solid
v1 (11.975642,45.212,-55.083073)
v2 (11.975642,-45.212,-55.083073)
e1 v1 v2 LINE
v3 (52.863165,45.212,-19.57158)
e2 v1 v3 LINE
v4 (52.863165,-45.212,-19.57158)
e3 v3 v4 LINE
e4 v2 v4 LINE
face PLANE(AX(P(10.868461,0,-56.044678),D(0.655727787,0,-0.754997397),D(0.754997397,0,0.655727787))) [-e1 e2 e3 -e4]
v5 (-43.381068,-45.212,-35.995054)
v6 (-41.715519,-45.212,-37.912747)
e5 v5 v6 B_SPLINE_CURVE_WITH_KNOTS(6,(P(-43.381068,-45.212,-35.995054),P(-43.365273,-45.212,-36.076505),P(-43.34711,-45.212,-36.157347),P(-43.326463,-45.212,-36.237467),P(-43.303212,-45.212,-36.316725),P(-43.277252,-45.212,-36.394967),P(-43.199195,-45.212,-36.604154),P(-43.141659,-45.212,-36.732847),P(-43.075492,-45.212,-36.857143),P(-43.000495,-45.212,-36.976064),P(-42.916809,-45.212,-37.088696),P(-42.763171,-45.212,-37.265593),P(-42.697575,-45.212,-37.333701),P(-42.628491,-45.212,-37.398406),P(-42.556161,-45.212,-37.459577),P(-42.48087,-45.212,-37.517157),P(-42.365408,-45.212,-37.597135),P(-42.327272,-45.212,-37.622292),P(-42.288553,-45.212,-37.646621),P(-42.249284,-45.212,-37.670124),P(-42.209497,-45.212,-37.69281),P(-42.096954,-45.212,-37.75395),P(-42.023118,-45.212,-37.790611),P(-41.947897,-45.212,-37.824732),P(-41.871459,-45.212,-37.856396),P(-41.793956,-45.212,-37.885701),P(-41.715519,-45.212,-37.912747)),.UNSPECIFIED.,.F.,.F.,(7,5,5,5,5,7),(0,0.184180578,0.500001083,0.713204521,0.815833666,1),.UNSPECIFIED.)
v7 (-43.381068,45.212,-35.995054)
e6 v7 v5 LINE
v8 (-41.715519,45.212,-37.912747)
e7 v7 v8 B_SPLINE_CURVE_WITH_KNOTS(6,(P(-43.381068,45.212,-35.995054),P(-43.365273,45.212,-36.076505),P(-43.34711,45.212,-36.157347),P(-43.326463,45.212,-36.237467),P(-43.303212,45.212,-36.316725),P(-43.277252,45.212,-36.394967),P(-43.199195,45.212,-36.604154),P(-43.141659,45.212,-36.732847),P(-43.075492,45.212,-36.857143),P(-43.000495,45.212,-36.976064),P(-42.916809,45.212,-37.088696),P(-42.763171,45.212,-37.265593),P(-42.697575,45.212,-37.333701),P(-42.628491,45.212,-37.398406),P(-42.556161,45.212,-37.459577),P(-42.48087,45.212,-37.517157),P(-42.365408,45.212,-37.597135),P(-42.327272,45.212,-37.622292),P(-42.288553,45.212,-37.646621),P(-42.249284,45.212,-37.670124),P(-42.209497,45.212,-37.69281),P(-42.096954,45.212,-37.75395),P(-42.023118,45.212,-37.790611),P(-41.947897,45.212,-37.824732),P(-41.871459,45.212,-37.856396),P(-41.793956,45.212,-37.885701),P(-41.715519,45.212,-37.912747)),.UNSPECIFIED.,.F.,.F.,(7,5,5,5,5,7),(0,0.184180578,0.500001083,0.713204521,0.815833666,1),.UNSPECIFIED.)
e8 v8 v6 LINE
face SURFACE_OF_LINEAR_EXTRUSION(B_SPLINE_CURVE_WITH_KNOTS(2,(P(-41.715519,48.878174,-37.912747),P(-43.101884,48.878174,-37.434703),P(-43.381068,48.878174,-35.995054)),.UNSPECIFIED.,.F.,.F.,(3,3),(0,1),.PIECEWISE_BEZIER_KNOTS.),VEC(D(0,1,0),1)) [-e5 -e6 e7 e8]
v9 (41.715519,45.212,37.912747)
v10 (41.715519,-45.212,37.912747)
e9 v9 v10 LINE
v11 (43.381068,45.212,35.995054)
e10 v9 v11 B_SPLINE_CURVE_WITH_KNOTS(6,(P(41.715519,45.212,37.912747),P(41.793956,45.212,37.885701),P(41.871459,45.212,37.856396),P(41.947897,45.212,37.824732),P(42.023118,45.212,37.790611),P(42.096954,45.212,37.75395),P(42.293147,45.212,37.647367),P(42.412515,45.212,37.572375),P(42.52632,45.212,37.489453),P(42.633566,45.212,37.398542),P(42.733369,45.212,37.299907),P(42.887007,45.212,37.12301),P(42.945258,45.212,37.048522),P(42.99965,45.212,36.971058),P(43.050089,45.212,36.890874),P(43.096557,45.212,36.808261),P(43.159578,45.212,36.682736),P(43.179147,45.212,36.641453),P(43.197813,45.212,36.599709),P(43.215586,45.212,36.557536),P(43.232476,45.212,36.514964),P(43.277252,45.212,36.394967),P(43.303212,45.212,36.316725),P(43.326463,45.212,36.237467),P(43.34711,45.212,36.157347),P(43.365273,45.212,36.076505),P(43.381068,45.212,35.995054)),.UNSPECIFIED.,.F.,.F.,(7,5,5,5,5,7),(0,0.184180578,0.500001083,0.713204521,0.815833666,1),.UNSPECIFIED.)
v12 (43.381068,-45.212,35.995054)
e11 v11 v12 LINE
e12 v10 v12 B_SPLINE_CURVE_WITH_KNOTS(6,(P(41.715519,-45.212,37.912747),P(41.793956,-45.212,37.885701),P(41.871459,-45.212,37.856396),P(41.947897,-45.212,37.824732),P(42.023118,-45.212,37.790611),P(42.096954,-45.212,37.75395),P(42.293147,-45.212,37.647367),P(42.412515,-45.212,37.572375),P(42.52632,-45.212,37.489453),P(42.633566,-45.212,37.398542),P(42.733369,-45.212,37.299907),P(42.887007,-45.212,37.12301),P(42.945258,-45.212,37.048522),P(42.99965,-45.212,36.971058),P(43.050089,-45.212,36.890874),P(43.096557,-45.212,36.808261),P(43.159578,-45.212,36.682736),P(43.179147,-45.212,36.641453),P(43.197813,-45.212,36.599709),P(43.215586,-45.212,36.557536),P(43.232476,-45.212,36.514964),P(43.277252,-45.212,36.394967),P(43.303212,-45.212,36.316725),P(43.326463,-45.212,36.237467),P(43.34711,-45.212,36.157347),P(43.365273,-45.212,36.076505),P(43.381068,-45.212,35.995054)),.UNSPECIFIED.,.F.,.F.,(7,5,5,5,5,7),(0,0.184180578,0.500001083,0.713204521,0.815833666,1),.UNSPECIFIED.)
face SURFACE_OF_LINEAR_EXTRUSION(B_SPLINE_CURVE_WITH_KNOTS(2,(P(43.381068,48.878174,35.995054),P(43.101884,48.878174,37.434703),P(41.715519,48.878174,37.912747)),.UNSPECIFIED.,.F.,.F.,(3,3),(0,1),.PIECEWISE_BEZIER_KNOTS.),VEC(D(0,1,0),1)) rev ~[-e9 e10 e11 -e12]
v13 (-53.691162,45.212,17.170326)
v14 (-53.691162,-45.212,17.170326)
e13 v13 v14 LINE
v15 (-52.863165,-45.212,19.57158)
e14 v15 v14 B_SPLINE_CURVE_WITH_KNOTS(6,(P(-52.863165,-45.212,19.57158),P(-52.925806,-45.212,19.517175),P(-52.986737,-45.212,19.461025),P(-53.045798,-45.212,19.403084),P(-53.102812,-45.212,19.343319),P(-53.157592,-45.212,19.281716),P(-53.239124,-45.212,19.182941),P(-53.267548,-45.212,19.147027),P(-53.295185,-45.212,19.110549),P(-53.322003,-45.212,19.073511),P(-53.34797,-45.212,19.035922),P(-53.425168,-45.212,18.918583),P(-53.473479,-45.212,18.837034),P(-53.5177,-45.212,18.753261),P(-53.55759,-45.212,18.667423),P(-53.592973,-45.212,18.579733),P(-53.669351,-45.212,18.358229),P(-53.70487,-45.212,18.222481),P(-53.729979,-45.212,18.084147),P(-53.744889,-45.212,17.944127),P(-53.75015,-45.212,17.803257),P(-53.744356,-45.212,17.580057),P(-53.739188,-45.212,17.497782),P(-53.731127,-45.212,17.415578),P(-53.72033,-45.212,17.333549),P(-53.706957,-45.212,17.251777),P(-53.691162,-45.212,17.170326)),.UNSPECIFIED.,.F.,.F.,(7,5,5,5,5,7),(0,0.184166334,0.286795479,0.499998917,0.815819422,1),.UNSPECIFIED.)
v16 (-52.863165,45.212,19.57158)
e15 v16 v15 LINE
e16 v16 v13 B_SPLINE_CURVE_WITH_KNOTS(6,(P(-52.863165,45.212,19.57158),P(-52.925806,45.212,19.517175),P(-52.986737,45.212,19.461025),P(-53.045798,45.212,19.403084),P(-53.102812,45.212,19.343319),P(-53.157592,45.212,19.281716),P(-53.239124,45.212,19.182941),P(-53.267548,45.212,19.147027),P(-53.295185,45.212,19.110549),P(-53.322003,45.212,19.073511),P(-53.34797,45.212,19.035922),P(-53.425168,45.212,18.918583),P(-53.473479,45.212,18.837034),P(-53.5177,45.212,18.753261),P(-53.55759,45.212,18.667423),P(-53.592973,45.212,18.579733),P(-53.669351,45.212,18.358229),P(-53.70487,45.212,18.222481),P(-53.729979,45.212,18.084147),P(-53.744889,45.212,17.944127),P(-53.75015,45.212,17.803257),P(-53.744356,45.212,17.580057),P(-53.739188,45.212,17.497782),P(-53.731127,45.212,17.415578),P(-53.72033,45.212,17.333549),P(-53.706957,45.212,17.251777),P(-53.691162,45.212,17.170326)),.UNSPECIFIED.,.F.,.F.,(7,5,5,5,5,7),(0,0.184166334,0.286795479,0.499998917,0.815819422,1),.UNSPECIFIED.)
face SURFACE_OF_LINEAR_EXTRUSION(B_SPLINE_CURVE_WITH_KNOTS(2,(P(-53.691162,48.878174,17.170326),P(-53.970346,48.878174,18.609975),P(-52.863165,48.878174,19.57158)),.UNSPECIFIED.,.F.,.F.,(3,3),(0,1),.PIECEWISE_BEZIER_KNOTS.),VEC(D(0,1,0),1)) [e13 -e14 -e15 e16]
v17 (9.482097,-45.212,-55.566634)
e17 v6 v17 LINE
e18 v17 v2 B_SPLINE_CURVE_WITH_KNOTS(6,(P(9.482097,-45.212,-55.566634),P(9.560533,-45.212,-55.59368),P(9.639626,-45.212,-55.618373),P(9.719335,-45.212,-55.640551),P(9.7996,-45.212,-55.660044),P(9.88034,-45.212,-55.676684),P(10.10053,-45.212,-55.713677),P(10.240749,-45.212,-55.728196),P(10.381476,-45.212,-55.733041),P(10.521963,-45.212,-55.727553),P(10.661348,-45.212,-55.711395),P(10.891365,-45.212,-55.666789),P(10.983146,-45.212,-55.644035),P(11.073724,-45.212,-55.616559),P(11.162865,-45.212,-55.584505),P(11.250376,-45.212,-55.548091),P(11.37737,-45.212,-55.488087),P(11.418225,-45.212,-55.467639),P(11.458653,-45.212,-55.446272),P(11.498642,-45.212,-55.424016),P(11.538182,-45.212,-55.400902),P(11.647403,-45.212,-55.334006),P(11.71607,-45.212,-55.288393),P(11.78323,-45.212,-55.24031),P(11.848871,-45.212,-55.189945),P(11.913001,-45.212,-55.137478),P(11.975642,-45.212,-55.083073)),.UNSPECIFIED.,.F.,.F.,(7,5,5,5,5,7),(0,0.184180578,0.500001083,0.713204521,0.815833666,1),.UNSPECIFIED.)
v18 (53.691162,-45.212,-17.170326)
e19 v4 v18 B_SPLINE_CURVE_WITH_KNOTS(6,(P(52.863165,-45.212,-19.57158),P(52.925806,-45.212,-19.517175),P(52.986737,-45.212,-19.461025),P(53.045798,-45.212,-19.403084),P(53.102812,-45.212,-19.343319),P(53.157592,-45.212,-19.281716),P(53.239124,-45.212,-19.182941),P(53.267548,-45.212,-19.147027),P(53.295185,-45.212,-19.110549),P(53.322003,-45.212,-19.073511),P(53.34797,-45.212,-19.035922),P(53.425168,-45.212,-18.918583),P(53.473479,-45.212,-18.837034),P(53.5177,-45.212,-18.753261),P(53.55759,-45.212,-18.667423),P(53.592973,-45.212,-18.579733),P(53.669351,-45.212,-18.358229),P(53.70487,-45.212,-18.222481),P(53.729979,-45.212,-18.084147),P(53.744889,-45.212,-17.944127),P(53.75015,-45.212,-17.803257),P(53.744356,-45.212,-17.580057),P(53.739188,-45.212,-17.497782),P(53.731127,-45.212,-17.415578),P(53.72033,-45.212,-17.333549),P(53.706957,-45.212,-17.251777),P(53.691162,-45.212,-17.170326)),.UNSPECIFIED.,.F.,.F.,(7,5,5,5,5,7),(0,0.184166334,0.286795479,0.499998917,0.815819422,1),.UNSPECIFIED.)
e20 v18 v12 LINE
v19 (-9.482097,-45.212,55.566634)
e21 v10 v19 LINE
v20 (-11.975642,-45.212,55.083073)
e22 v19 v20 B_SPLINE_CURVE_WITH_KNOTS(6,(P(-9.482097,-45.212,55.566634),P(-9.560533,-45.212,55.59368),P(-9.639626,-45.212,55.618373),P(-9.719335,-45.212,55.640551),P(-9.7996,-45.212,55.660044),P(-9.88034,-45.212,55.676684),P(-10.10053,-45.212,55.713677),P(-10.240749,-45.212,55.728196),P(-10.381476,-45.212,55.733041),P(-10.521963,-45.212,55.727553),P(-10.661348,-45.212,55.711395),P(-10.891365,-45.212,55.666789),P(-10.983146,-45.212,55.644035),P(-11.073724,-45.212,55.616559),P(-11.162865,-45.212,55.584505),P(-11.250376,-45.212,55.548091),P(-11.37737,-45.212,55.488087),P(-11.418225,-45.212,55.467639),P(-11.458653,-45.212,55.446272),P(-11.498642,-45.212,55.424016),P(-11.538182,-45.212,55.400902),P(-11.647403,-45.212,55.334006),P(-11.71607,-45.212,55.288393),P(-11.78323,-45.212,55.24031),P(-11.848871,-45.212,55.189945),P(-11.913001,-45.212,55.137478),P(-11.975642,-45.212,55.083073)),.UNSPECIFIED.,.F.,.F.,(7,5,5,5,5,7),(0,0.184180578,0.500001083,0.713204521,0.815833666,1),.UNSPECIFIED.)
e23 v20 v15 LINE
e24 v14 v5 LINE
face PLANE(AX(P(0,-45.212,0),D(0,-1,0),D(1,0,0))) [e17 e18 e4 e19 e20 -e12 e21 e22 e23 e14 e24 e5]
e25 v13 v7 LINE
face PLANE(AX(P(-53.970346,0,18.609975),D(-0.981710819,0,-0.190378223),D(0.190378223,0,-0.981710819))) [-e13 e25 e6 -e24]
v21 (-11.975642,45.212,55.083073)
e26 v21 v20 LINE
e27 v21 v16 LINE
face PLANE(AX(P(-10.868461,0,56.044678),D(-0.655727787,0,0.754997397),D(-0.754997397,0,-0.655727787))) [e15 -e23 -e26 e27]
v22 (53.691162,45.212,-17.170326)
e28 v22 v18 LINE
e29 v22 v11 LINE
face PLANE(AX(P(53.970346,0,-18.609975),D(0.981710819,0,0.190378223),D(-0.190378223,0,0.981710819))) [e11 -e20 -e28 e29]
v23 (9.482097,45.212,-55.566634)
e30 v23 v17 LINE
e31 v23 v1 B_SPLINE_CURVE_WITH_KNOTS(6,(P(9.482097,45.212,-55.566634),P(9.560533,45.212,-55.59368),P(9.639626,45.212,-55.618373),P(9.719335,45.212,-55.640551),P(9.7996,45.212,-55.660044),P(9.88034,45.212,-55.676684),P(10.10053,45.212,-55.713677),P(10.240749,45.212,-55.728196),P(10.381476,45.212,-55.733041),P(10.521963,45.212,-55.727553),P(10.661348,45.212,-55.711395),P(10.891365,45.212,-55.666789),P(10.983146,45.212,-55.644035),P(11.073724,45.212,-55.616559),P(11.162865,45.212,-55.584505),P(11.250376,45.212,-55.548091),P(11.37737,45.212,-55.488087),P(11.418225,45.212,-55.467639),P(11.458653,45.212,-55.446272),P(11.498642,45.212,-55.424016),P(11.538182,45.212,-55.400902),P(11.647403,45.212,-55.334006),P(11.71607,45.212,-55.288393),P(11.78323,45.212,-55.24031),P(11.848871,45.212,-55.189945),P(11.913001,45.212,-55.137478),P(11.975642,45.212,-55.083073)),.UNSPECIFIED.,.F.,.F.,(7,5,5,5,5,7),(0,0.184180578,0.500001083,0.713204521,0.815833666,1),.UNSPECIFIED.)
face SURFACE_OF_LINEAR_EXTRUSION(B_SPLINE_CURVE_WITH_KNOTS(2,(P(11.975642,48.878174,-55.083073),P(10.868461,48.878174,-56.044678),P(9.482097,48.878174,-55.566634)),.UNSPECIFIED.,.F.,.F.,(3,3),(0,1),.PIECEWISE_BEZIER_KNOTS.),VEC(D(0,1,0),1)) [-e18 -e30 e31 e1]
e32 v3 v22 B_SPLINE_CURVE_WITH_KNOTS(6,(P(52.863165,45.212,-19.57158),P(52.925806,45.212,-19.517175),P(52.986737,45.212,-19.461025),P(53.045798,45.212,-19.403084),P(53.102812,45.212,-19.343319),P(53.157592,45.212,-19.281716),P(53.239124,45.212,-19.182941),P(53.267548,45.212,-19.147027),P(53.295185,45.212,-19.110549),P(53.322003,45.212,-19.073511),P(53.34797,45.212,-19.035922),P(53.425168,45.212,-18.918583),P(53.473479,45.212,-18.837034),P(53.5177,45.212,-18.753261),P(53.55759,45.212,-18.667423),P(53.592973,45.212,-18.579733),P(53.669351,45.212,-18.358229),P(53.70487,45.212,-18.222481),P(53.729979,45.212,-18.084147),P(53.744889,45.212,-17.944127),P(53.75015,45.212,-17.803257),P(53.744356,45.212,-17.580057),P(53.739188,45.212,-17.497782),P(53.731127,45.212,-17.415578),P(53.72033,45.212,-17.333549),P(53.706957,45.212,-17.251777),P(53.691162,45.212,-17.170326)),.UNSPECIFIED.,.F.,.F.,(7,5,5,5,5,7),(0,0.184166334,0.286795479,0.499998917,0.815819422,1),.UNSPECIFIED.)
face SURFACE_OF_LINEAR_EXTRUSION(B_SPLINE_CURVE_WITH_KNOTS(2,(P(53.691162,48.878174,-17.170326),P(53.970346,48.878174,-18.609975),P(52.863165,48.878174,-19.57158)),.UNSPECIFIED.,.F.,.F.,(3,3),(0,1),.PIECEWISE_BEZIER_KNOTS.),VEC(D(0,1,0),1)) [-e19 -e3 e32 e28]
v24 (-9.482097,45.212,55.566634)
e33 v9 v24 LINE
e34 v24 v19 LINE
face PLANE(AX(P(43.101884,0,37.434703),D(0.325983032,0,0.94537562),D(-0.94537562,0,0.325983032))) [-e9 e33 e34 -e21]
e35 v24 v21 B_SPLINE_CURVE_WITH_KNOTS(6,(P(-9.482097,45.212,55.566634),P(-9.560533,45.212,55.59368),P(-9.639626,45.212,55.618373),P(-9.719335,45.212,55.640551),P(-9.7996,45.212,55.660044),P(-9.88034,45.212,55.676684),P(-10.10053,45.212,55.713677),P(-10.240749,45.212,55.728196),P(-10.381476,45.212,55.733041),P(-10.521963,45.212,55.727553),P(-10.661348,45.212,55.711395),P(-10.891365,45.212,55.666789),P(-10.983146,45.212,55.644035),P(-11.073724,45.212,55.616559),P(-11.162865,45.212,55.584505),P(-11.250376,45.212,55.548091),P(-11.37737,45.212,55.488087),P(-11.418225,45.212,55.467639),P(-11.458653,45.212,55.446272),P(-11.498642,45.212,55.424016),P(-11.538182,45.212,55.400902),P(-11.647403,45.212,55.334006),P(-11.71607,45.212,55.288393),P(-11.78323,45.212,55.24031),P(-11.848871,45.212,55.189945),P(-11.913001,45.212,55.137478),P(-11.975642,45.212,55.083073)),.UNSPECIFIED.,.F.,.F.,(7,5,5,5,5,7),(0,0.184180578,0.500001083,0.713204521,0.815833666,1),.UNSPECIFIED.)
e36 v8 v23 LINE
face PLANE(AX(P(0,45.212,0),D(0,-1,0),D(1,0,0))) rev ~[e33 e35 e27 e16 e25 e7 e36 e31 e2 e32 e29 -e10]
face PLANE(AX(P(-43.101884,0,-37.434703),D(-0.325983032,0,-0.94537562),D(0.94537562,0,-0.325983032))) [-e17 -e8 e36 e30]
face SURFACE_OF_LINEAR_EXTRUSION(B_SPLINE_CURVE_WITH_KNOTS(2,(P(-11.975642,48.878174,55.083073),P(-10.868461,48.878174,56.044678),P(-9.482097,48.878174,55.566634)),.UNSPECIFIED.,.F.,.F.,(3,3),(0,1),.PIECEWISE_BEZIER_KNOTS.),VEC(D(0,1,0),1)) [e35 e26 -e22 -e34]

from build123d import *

# Parameters (mm, degrees)
F1_DEPTH    = 45.212
F2_T1_DEPTH = 97.7563484187


# Not quite as in the source:
# - a fillet or chamfer that OpenCascade refuses, or shapes differently, is made with other operations: its cross-section is extruded or revolved along the edge and cut away or added


with BuildPart() as f1:
    # F0 (on Front) → F1 (new body, symmetric)
    with BuildSketch(Plane.XZ):
        Polygon((53.9703455338, -18.609975213), (43.1018840651, 37.4347026768), (-10.8684614687, 56.0446778898), (-53.9703455338, 18.609975213), (-43.1018840651, -37.4347026768), (10.8684614687, -56.0446778898), align=None)
    extrude(amount=F1_DEPTH, both=True)

    # F2: fillet of radius 2.54 on 6 edges, made by hand

    # F2_s2 → F2_t1 (cut)
    with BuildSketch(Plane.XZ.offset(-48.8781742094)):
        with BuildLine():
            add(Edge.make_bspline(
                [(-11.9756422622, 55.0830729689), (-10.8684614687, 56.0446778898), (-9.4820967821, 55.5666336564)],
                knots=[0, 0, 0, 1, 1, 1], degree=2, weights=[1, 1, 1]))
            Line((-9.4820967821, 55.5666336564), (-10.8684614687, 56.0446778898))
            Line((-10.8684614687, 56.0446778898), (-11.9756422622, 55.0830729689))
        make_face()
        with BuildLine():
            add(Edge.make_bspline(
                [(43.3810679582, 35.9950535226), (43.1018840651, 37.4347026768), (41.7155193785, 37.9127469102)],
                knots=[0, 0, 0, 1, 1, 1], degree=2, weights=[1, 1, 1]))
            Line((41.7155193785, 37.9127469102), (43.1018840651, 37.4347026768))
            Line((43.1018840651, 37.4347026768), (43.3810679582, 35.9950535226))
        make_face()
        with BuildLine():
            add(Edge.make_bspline(
                [(-53.6911616407, 17.1703260588), (-53.9703455338, 18.609975213), (-52.8631647403, 19.5715801338)],
                knots=[0, 0, 0, 1, 1, 1], degree=2, weights=[1, 1, 1]))
            Line((-52.8631647403, 19.5715801338), (-53.9703455338, 18.609975213))
            Line((-53.9703455338, 18.609975213), (-53.6911616407, 17.1703260588))
        make_face()
        with BuildLine():
            add(Edge.make_bspline(
                [(-41.7155193785, -37.9127469102), (-43.1018840651, -37.4347026768), (-43.3810679582, -35.9950535226)],
                knots=[0, 0, 0, 1, 1, 1], degree=2, weights=[1, 1, 1]))
            Line((-43.3810679582, -35.9950535226), (-43.1018840651, -37.4347026768))
            Line((-43.1018840651, -37.4347026768), (-41.7155193785, -37.9127469102))
        make_face()
        with BuildLine():
            add(Edge.make_bspline(
                [(11.9756422622, -55.0830729689), (10.8684614687, -56.0446778898), (9.4820967821, -55.5666336564)],
                knots=[0, 0, 0, 1, 1, 1], degree=2, weights=[1, 1, 1]))
            Line((9.4820967821, -55.5666336564), (10.8684614687, -56.0446778898))
            Line((10.8684614687, -56.0446778898), (11.9756422622, -55.0830729689))
        make_face()
        with BuildLine():
            add(Edge.make_bspline(
                [(53.6911616407, -17.1703260588), (53.9703455338, -18.609975213), (52.8631647403, -19.5715801338)],
                knots=[0, 0, 0, 1, 1, 1], degree=2, weights=[1, 1, 1]))
            Line((52.8631647403, -19.5715801338), (53.9703455338, -18.609975213))
            Line((53.9703455338, -18.609975213), (53.6911616407, -17.1703260588))
        make_face()
    extrude(amount=F2_T1_DEPTH, mode=Mode.SUBTRACT)


solid = f1.part
